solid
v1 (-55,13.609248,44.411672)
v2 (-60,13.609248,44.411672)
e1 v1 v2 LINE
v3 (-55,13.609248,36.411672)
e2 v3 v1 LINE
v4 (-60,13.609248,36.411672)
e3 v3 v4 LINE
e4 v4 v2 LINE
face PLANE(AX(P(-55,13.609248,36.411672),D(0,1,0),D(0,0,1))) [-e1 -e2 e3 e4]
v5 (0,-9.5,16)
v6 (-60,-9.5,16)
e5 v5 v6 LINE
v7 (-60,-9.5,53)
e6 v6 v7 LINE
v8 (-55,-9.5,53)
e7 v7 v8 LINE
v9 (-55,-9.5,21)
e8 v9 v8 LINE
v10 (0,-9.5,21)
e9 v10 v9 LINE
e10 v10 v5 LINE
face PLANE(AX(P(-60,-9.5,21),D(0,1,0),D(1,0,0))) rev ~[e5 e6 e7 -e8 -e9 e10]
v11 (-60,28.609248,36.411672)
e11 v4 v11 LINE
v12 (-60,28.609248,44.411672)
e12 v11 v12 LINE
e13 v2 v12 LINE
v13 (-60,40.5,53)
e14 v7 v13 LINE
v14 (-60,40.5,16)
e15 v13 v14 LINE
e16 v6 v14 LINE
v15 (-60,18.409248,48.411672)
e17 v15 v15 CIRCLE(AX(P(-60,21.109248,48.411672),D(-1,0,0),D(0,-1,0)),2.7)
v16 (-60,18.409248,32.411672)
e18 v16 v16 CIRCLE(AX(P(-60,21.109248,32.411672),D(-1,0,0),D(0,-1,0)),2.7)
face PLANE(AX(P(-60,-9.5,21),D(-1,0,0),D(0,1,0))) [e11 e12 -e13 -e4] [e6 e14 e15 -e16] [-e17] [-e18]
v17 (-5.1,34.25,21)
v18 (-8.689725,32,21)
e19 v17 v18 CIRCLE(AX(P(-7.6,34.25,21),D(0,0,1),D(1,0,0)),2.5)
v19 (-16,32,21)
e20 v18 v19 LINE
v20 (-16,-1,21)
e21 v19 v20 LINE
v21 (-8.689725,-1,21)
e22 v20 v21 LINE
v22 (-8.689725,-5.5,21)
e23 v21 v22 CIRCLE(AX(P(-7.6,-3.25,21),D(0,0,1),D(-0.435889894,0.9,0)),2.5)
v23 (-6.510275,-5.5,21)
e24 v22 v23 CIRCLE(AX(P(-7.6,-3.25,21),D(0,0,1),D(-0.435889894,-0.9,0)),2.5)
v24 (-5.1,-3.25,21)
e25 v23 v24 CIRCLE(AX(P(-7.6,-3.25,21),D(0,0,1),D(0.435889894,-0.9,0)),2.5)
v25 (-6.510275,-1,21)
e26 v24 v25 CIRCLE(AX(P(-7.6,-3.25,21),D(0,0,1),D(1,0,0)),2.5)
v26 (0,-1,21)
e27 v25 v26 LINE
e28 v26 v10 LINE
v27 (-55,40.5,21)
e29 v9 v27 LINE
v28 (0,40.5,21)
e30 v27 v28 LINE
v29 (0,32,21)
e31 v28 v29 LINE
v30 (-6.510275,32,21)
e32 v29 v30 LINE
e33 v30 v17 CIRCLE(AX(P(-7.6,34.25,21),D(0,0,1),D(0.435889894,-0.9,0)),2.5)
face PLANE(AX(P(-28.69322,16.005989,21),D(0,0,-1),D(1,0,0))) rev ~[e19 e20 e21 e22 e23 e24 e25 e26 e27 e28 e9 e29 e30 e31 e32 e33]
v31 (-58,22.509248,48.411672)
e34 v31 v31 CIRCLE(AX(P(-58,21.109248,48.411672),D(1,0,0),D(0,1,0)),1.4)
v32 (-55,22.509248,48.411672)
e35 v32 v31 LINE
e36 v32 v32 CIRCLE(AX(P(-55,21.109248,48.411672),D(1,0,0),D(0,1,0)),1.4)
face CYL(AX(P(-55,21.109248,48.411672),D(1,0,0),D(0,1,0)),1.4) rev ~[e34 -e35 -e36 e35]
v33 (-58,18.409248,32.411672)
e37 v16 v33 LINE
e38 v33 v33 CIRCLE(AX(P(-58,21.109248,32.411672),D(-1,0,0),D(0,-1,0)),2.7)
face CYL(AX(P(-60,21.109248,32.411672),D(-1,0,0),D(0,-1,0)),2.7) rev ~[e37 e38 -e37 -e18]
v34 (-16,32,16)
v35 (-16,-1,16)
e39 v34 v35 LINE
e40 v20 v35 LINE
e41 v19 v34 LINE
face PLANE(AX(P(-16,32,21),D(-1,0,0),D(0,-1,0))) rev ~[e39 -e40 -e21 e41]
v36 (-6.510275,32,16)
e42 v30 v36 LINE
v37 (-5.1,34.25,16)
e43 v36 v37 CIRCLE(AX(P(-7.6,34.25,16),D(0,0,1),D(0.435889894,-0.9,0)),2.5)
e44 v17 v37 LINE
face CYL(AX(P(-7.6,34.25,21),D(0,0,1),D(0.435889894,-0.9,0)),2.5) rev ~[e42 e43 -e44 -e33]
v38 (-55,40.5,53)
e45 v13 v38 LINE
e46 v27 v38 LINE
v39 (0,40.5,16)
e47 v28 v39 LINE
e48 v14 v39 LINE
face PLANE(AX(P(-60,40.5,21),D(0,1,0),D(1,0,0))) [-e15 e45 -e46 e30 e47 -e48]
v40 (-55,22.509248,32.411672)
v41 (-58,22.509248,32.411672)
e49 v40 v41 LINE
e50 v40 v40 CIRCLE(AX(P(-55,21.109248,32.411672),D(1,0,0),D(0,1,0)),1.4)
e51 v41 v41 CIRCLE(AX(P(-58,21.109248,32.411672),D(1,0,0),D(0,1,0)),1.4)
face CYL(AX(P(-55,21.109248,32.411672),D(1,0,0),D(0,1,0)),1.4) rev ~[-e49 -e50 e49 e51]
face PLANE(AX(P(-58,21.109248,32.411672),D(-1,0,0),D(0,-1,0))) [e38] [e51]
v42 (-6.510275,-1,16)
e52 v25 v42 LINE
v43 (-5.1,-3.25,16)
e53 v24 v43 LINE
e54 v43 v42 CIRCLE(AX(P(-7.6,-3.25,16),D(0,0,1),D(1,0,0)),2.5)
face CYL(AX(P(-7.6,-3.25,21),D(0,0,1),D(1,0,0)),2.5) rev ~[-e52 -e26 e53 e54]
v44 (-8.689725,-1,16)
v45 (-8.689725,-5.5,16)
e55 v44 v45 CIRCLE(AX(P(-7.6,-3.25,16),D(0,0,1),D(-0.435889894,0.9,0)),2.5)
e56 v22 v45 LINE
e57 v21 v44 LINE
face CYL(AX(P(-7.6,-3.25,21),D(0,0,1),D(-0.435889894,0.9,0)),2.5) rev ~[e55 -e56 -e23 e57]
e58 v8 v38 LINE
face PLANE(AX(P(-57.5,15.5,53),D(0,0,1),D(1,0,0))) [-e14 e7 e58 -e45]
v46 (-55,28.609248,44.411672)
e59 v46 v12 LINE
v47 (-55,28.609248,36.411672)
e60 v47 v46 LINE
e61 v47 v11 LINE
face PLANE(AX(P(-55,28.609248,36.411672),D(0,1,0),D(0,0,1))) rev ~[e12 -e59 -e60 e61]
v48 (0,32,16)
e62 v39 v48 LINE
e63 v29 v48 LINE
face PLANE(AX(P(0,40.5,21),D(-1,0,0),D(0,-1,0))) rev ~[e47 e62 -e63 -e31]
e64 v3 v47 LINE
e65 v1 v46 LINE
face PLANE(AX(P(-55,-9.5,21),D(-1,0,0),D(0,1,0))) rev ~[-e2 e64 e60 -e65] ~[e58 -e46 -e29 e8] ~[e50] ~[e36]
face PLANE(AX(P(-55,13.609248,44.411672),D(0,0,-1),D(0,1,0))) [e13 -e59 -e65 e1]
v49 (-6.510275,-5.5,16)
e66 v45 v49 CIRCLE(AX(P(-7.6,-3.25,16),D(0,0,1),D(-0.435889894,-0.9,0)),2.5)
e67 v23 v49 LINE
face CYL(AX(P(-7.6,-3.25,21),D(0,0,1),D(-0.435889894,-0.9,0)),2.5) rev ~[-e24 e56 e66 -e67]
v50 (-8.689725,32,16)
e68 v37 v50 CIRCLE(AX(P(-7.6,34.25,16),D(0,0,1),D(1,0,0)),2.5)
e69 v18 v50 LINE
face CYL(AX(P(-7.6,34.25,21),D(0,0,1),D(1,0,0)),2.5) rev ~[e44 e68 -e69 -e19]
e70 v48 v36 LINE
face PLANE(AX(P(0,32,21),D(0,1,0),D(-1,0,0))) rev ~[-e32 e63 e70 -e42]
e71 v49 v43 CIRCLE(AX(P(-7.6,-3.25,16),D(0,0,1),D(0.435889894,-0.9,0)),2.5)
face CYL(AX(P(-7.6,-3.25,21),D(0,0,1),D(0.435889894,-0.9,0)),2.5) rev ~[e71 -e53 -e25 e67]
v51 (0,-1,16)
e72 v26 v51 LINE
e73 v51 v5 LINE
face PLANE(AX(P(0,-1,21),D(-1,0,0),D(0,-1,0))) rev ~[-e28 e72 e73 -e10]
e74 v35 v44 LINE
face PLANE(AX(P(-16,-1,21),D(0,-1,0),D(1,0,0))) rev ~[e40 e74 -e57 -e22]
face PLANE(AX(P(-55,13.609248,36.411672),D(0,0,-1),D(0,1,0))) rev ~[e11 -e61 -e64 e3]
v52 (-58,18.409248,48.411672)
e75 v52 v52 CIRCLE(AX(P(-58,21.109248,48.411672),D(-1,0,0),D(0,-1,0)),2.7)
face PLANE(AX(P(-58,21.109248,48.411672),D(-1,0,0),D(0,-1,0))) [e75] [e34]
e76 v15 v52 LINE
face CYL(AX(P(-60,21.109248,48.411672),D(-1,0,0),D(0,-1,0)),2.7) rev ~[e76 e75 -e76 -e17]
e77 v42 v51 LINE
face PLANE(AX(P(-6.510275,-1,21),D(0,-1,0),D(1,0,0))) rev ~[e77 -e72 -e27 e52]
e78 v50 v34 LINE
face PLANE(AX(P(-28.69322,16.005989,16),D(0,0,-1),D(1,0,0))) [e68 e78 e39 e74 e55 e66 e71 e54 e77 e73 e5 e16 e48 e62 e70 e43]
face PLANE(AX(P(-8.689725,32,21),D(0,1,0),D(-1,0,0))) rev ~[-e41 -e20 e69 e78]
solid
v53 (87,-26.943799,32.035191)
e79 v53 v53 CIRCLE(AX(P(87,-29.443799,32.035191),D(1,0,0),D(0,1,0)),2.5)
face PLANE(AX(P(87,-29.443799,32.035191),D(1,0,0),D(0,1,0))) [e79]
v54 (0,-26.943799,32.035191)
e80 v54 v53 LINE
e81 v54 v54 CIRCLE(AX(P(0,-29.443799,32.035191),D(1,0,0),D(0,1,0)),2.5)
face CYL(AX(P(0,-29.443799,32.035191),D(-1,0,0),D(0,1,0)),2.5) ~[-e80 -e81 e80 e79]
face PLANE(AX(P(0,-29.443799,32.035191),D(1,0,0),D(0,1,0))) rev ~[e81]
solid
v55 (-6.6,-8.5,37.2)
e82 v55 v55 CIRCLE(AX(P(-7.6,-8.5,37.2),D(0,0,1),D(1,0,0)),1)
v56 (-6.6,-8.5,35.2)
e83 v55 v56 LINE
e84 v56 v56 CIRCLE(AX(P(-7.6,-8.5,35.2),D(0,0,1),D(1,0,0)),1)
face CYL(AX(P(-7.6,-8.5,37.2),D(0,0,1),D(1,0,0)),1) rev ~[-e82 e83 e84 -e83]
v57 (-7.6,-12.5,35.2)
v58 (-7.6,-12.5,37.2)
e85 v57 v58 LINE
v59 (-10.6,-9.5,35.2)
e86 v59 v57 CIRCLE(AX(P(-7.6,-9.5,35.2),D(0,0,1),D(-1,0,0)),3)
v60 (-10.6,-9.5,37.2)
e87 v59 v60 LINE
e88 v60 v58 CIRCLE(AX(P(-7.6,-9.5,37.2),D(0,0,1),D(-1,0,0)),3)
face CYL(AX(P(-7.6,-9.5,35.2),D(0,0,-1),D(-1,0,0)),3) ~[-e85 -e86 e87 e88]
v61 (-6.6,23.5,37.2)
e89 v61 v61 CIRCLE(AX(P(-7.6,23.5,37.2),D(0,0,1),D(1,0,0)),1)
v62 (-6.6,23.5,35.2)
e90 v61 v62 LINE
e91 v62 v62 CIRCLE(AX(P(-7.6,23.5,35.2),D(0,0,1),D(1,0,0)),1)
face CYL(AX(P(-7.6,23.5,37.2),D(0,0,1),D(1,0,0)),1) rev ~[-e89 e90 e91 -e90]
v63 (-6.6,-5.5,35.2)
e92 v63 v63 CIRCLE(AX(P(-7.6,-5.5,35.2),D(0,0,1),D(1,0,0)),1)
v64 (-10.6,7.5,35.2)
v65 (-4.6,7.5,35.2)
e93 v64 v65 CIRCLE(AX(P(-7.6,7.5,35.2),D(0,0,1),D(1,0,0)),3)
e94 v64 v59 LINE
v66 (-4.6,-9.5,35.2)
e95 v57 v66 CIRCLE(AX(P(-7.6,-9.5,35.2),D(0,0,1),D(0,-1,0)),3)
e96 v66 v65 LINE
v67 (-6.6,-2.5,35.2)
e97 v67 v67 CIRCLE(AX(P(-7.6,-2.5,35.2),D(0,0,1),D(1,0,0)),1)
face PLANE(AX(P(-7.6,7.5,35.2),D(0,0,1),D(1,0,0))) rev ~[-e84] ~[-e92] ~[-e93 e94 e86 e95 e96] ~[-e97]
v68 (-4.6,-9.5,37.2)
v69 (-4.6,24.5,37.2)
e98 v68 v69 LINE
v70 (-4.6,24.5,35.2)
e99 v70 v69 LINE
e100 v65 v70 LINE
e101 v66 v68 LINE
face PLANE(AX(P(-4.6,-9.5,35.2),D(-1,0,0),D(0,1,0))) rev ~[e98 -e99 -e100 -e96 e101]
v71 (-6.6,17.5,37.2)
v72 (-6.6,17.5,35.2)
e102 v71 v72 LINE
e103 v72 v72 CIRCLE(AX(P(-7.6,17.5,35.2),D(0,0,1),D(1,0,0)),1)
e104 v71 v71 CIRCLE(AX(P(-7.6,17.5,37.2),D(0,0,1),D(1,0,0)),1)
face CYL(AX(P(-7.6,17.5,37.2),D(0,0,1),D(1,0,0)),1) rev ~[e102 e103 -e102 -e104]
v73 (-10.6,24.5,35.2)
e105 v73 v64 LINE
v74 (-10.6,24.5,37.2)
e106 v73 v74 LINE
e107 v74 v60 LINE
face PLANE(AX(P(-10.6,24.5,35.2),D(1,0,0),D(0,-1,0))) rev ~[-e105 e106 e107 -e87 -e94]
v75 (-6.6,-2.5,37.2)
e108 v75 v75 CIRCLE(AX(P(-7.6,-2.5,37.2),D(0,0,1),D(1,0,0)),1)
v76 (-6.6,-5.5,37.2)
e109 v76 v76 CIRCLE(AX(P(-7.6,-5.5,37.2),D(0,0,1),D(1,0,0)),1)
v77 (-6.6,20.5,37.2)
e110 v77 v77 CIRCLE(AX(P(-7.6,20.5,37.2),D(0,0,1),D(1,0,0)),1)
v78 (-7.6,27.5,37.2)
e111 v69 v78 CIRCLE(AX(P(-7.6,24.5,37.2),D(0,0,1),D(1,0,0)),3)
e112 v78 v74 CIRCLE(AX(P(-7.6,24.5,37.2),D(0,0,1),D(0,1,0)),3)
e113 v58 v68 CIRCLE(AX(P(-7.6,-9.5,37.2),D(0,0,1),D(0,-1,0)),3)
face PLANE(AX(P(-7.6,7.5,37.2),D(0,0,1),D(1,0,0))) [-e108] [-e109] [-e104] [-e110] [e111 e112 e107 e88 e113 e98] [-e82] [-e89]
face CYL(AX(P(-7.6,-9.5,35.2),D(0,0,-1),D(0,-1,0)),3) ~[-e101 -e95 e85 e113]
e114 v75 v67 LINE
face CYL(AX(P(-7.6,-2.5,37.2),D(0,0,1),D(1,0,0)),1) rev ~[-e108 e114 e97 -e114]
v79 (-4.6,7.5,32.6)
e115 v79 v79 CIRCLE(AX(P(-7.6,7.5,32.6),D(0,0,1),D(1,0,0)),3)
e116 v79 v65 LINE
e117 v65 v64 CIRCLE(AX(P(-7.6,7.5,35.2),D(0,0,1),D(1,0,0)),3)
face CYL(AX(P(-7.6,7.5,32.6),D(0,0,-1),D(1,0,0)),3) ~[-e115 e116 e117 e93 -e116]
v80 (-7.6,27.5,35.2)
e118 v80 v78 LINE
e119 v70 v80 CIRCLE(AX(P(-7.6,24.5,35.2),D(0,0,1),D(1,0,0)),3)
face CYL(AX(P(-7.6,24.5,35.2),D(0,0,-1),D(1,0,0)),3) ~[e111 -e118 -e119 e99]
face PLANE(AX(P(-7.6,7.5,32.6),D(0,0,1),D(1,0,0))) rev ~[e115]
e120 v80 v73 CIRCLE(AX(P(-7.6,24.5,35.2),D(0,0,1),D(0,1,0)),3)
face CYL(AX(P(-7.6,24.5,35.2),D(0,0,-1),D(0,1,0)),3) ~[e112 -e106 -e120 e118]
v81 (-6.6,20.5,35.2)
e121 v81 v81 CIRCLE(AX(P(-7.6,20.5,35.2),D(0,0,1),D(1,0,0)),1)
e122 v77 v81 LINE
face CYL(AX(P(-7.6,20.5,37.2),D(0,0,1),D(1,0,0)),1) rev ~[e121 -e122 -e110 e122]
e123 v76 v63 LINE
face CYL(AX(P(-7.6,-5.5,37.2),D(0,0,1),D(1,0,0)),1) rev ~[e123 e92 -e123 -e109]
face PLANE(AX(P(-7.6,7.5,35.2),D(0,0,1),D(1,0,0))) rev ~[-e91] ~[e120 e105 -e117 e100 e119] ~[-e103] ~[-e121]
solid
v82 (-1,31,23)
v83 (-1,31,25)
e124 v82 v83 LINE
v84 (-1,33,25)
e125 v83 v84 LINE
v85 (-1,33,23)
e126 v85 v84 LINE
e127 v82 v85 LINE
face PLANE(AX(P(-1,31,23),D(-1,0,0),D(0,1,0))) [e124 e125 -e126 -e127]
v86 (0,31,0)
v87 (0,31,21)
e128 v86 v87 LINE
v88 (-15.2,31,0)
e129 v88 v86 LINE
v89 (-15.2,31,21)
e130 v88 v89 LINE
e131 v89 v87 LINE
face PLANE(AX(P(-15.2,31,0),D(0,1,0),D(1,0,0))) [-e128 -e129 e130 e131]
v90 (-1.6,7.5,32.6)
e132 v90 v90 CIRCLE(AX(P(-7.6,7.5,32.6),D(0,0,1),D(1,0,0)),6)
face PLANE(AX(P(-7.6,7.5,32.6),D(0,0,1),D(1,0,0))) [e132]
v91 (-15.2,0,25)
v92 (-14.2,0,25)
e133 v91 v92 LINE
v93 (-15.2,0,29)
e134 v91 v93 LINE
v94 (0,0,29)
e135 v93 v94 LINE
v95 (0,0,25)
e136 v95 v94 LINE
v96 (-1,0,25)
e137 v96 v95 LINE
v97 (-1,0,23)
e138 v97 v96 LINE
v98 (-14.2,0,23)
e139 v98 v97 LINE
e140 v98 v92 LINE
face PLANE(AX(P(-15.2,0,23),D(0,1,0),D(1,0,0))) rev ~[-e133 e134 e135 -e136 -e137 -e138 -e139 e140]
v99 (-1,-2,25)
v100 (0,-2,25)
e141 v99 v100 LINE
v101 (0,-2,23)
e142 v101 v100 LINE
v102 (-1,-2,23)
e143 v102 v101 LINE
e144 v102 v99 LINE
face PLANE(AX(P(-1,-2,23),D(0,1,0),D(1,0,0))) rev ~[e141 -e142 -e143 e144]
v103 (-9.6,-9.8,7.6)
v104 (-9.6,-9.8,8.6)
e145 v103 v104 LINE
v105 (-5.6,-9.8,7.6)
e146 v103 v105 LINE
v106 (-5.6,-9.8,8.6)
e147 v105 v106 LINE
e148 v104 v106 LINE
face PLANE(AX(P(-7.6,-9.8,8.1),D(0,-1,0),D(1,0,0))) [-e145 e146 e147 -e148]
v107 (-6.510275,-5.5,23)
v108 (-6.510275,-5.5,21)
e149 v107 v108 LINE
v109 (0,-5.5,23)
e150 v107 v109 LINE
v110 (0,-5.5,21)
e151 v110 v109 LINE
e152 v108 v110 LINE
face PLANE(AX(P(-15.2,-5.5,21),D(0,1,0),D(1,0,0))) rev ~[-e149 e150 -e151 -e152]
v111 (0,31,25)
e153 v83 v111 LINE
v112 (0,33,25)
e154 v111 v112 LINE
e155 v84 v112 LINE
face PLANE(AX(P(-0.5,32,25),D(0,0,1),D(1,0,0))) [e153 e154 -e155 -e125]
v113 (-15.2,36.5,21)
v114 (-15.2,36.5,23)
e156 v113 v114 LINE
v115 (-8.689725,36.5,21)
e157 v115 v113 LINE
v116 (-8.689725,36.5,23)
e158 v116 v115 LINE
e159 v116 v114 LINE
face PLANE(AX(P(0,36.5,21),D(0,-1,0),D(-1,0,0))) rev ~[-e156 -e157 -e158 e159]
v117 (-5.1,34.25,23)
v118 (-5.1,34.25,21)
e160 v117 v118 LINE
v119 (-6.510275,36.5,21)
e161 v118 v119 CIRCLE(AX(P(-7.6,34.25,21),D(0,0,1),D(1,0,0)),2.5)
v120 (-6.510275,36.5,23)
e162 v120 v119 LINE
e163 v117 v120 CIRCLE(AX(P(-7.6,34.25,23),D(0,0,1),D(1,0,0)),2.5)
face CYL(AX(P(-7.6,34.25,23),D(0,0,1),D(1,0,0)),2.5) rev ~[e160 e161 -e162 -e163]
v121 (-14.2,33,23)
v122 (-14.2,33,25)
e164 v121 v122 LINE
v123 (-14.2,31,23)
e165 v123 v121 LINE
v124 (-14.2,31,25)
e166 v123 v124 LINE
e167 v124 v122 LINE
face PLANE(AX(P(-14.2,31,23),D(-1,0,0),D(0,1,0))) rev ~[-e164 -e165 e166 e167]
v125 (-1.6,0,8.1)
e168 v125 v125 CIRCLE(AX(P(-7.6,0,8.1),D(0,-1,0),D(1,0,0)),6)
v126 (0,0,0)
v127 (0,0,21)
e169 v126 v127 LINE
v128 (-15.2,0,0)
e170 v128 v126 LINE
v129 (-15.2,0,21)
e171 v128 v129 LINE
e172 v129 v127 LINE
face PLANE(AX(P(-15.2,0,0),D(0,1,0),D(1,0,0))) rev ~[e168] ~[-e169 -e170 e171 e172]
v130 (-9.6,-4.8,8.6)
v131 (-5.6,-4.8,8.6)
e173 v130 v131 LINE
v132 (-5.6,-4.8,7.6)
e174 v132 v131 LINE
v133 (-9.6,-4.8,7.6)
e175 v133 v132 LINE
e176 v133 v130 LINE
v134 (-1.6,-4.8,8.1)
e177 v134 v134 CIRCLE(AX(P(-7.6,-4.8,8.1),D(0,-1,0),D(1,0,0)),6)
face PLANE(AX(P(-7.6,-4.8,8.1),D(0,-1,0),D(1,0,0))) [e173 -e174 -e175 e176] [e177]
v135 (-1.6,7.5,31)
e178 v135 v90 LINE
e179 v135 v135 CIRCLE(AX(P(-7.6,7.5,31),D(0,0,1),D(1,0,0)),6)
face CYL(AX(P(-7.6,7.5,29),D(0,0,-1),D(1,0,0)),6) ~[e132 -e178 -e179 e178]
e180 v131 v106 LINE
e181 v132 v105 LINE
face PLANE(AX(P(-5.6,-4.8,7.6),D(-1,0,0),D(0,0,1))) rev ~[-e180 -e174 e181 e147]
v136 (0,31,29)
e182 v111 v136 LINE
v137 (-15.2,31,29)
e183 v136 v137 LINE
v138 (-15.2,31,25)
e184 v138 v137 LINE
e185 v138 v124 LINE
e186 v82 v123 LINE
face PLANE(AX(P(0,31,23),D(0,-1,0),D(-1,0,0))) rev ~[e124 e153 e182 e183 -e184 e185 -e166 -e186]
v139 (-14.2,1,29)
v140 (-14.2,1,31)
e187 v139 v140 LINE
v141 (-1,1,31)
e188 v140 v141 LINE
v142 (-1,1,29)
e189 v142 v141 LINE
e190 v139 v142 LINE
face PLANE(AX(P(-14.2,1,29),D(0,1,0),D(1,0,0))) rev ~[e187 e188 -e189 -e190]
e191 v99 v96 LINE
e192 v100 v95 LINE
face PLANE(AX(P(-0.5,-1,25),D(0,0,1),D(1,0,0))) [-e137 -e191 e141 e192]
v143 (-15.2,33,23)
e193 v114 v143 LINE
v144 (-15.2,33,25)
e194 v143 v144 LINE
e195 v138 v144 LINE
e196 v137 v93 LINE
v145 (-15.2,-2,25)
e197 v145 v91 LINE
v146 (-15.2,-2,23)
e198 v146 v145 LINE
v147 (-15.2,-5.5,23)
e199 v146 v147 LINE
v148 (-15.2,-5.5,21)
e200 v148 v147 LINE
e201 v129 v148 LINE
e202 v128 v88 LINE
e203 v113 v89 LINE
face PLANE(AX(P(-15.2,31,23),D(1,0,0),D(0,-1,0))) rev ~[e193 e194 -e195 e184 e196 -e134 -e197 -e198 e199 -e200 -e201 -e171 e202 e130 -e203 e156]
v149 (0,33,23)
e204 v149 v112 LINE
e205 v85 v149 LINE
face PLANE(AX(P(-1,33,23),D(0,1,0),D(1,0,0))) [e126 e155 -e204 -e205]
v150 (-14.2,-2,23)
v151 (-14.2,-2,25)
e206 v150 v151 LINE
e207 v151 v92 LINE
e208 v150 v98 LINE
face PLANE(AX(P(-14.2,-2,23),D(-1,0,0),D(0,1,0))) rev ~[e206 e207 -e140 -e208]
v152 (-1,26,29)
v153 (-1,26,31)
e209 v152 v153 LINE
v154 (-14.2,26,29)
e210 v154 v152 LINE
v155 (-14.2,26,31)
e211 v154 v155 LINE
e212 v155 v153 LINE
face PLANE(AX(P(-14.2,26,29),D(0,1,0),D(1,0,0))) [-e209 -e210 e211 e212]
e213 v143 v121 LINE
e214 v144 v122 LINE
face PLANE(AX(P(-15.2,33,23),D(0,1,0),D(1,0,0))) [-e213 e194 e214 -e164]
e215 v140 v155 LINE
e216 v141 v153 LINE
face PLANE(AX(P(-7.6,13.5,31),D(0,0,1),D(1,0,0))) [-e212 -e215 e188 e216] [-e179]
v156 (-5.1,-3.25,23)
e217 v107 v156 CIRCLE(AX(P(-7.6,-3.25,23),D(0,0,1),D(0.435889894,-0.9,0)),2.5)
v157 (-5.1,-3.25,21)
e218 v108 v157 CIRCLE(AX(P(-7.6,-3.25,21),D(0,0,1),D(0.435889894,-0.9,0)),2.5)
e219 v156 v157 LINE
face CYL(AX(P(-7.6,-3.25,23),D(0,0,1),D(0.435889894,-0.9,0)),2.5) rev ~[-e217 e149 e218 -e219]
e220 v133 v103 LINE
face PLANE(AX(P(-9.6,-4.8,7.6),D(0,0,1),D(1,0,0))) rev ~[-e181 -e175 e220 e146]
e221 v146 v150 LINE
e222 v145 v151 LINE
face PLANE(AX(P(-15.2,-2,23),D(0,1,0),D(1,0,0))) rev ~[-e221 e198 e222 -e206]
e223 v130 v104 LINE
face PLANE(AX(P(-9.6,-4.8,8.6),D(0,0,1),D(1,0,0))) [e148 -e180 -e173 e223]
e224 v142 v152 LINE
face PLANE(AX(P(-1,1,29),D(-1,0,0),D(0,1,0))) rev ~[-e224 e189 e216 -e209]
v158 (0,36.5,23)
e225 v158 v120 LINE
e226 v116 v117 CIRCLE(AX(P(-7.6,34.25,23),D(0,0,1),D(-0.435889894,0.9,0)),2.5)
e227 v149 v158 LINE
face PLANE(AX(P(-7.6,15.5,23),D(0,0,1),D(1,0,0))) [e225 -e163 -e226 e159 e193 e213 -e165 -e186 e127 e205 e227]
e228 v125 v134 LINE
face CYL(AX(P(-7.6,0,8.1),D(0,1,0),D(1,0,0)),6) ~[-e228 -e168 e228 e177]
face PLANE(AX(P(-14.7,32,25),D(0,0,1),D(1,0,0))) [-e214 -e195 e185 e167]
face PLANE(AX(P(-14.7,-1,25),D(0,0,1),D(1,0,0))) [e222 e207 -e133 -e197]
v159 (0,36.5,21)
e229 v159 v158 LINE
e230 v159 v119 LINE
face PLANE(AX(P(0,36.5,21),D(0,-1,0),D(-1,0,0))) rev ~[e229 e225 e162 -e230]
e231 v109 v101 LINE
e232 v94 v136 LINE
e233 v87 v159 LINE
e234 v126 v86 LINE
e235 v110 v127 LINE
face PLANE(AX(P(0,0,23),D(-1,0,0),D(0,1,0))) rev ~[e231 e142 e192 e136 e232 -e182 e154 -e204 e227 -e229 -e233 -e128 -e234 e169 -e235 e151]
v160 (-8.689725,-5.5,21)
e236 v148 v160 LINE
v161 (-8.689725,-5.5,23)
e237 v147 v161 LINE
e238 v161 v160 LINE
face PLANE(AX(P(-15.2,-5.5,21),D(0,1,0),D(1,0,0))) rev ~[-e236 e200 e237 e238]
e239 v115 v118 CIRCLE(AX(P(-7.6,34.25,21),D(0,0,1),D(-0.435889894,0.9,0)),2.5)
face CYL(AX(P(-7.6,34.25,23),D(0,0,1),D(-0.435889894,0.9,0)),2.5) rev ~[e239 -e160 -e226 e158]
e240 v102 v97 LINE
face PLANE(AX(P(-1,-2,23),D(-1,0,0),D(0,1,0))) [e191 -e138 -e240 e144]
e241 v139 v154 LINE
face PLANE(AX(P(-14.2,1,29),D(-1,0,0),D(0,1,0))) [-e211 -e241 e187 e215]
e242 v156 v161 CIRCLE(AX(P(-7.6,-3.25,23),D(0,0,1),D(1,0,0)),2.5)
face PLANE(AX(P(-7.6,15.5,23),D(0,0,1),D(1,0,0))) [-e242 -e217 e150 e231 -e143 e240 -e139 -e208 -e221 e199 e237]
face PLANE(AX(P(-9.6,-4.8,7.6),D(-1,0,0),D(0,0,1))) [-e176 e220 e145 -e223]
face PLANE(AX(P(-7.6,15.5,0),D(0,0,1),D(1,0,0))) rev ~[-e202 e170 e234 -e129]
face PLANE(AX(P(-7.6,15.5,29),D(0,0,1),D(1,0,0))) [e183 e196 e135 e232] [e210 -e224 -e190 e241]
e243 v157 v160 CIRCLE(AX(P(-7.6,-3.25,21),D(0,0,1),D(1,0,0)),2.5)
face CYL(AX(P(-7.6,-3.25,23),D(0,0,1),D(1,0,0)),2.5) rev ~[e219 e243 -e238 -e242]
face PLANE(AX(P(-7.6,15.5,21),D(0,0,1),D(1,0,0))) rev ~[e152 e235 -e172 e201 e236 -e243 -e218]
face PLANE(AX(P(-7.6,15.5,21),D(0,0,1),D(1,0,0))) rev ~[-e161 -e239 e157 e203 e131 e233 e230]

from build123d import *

# Parameters (mm, degrees)
F0_W      = 15.2
F0_H      = 31
F1_DEPTH  = 21
F3_DEPTH  = 2
F5_DEPTH  = 14.4
F4_W      = 1
F4_H      = 2
F6_DEPTH  = 2
F7_DEPTH  = 6
F8_R      = 6
F9_DEPTH  = 3.6
F8_W      = 13.2
F8_H      = 25
F10_DEPTH = 2
F11_R     = 3
F12_DEPTH = 2.6
F13_R     = 6
F14_DEPTH = 4.8
F15_W     = 4
F15_H     = 1
F16_DEPTH = 5
F18_DEPTH = 2
F19_R     = 1
F20_DEPTH = 2
F22_DEPTH = 5
F23_W     = 5
F23_H     = 50
F24_DEPTH = 32
F25_R     = 1.4
F25_W     = 15
F25_H     = 8
F26_DEPTH = 5
F27_R     = 2.7
F28_DEPTH = 2
F29_R     = 2.5
F30_DEPTH = 87


# Not quite as in the source:
# - an extrude ends at something that could not be found from the text; its depth is read off the source's solid


with BuildPart() as f1:
    # F0 (on Top) → F1 (new body)
    with BuildSketch(Plane.XY):
        with Locations((-7.6, 15.5)):
            Rectangle(F0_W, F0_H)
    extrude(amount=F1_DEPTH)

    # F2 (on face) → F3 (join)
    with BuildSketch(Plane.XY.offset(21)):
        Polygon((0, 36.5), (-15.2, 36.5), (-15.2, 31), (-15.2, 0), (-15.2, -5.5), (0, -5.5), (0, 0), (0, 31), align=None)
    extrude(amount=F3_DEPTH)

    # F4 (on face) → F5 (cut, through all)
    with BuildSketch(Plane.XY.offset(23)):
        with BuildLine():
            ThreePointArc((-6.5102752641, 36.5), (-7.6, 36.75), (-8.6897247359, 36.5))
            Line((-8.6897247359, 36.5), (-6.5102752641, 36.5))
        make_face()
        with BuildLine():
            Line((-6.5102752641, 36.5), (-8.6897247359, 36.5))
            ThreePointArc((-8.6897247359, 36.5), (-8.9277213865, 32.1317091985), (-5.1, 34.25))
            ThreePointArc((-5.1, 34.25), (-5.4817091985, 35.5777213865), (-6.5102752641, 36.5))
        make_face()
        with BuildLine():
            Line((-6.5102752641, -5.5), (-8.6897247359, -5.5))
            ThreePointArc((-8.6897247359, -5.5), (-7.6, -5.75), (-6.5102752641, -5.5))
        make_face()
        with BuildLine():
            ThreePointArc((-5.1, -3.25), (-8.9277213865, -1.1317091985), (-8.6897247359, -5.5))
            Line((-8.6897247359, -5.5), (-6.5102752641, -5.5))
            ThreePointArc((-6.5102752641, -5.5), (-5.4817091985, -4.5777213865), (-5.1, -3.25))
        make_face()
    extrude(amount=-F5_DEPTH, mode=Mode.SUBTRACT)

    # F4 (on face) → F6 (join)
    with BuildSketch(Plane.XY.offset(23)):
        with Locations((-14.7, 32)):
            Rectangle(F4_W, F4_H)
        with Locations((-0.5, 32)):
            Rectangle(F4_W, F4_H)
        with Locations((-0.5, -1)):
            Rectangle(F4_W, F4_H)
        with Locations((-14.7, -1)):
            Rectangle(F4_W, F4_H)
    extrude(amount=F6_DEPTH)

    # F4 (on face) → F7 (join)
    with BuildSketch(Plane.XY.offset(23)):
        Polygon((-14.2, 31), (-15.2, 31), (-15.2, 0), (-14.2, 0), (-1, 0), (0, 0), (0, 31), (-1, 31), align=None)
    extrude(amount=F7_DEPTH)

    # F8 (on face) → F9 (join)
    with BuildSketch(Plane.XY.offset(29)):
        with Locations((-7.6, 7.5)):
            Circle(F8_R)
    extrude(amount=F9_DEPTH)

    # F8 (on face) → F10 (join)
    with BuildSketch(Plane.XY.offset(29)):
        with Locations((-7.6, 13.5)):
            Rectangle(F8_W, F8_H)
        with Locations((-7.6, 7.5)):
            Circle(F8_R, mode=Mode.SUBTRACT)
    extrude(amount=F10_DEPTH)

    # F13 (on face) → F14 (join)
    with BuildSketch(Plane.XZ):
        with Locations((-7.6, 8.1)):
            Circle(F13_R)
    extrude(amount=F14_DEPTH)

    # F15 (on face) → F16 (join)
    with BuildSketch(Plane.XZ.offset(4.8)):
        with Locations((-7.6, 8.1)):
            Rectangle(F15_W, F15_H)
    extrude(amount=F16_DEPTH)


with BuildPart() as f12:
    # F11 (on face) → F12 (new body)
    with BuildSketch(Plane.XY.offset(32.6)):
        with Locations((-7.6, 7.5)):
            Circle(F11_R)
    extrude(amount=F12_DEPTH)

    # F17 (on face) → F18 (join)
    with BuildSketch(Plane.XY.offset(35.2)):
        with BuildLine():
            ThreePointArc((-7.6, 27.5), (-9.7213203436, 26.6213203436), (-10.6, 24.5))
            Line((-10.6, 24.5), (-10.6, -9.5))
            ThreePointArc((-10.6, -9.5), (-9.7213203436, -11.6213203436), (-7.6, -12.5))
            ThreePointArc((-7.6, -12.5), (-5.4786796564, -11.6213203436), (-4.6, -9.5))
            Line((-4.6, -9.5), (-4.6, 24.5))
            ThreePointArc((-4.6, 24.5), (-5.4786796564, 26.6213203436), (-7.6, 27.5))
        make_face()
    extrude(amount=F18_DEPTH)

    # F19 (on face) → F20 (cut, through all)
    with BuildSketch(Plane.XY.offset(37.2)):
        with Locations((-7.6, 23.5)):
            Circle(F19_R)
        with Locations((-7.6, -8.5)):
            Circle(F19_R)
        with Locations((-7.6, 20.5)):
            Circle(F19_R)
        with Locations((-7.6, 17.5)):
            Circle(F19_R)
        with Locations((-7.6, -2.5)):
            Circle(F19_R)
        with Locations((-7.6, -5.5)):
            Circle(F19_R)
    extrude(amount=-F20_DEPTH, mode=Mode.SUBTRACT)


with BuildPart() as f22:
    # F21 (on face) → F22 (new body)
    with BuildSketch(Plane(origin=(0, 0, 21), x_dir=(1, 0, 0), z_dir=(0, 0, -1))):
        with BuildLine():
            Line((0, 5.5), (0, 9.5))
            Line((0, 9.5), (-60, 9.5))
            Line((-60, 9.5), (-60, -40.5))
            Line((-60, -40.5), (0, -40.5))
            Line((0, -40.5), (0, -32))
            Line((0, -32), (-6.5102752641, -32))
            ThreePointArc((-6.5102752641, -32), (-5.4817091985, -32.9222786135), (-5.1, -34.25))
            ThreePointArc((-5.1, -34.25), (-8.9277213865, -36.3682908015), (-8.6897247359, -32))
            Line((-8.6897247359, -32), (-16, -32))
            Line((-16, -32), (-16, 1))
            Line((-16, 1), (-15.2, 1))
            Line((-15.2, 1), (-15.2, 5.5))
            Line((-15.2, 5.5), (-8.6897247359, 5.5))
            ThreePointArc((-8.6897247359, 5.5), (-7.6, 5.75), (-6.5102752641, 5.5))
            Line((-6.5102752641, 5.5), (0, 5.5))
        make_face()
        with BuildLine():
            Line((0, 1), (0, 5.5))
            Line((0, 5.5), (-6.5102752641, 5.5))
            ThreePointArc((-6.5102752641, 5.5), (-5.4817091985, 4.5777213865), (-5.1, 3.25))
            ThreePointArc((-5.1, 3.25), (-5.4817091985, 1.9222786135), (-6.5102752641, 1))
            Line((-6.5102752641, 1), (0, 1))
        make_face()
        with BuildLine():
            ThreePointArc((-8.6897247359, 1), (-10.1, 3.25), (-8.6897247359, 5.5))
            Line((-8.6897247359, 5.5), (-15.2, 5.5))
            Line((-15.2, 5.5), (-15.2, 1))
            Line((-15.2, 1), (-8.6897247359, 1))
        make_face()
    extrude(amount=F22_DEPTH)

    # F23 (on face) → F24 (join)
    with BuildSketch(Plane.XY.offset(21)):
        with Locations((-57.5, 15.5)):
            Rectangle(F23_W, F23_H)
    extrude(amount=F24_DEPTH)

    # F25 (on face) → F26 (cut, through all)
    with BuildSketch(Plane.YZ.offset(-55)):
        with Locations((21.1092480145, 48.4116717948)):
            Circle(F25_R)
        with Locations((21.1092480145, 32.4116717948)):
            Circle(F25_R)
        with Locations((21.1092480145, 40.4116717948)):
            Rectangle(F25_W, F25_H)
    extrude(amount=-F26_DEPTH, mode=Mode.SUBTRACT)

    # F27 (on face) → F28 (cut)
    with BuildSketch(Plane(origin=(-60, 0, 0), x_dir=(0, -1, 0), z_dir=(-1, 0, 0))):
        with Locations((-21.1092480145, 32.4116717948)):
            Circle(F27_R)
        with Locations((-21.1092480145, 48.4116717948)):
            Circle(F27_R)
    extrude(amount=-F28_DEPTH, mode=Mode.SUBTRACT)


with BuildPart() as f30:
    # F29 (on Right) → F30 (new body)
    with BuildSketch(Plane.YZ):
        with Locations((-29.4437985867, 32.0351906121)):
            Circle(F29_R)
    extrude(amount=F30_DEPTH)


solid = Compound([f1.part, f12.part, f22.part, f30.part])
